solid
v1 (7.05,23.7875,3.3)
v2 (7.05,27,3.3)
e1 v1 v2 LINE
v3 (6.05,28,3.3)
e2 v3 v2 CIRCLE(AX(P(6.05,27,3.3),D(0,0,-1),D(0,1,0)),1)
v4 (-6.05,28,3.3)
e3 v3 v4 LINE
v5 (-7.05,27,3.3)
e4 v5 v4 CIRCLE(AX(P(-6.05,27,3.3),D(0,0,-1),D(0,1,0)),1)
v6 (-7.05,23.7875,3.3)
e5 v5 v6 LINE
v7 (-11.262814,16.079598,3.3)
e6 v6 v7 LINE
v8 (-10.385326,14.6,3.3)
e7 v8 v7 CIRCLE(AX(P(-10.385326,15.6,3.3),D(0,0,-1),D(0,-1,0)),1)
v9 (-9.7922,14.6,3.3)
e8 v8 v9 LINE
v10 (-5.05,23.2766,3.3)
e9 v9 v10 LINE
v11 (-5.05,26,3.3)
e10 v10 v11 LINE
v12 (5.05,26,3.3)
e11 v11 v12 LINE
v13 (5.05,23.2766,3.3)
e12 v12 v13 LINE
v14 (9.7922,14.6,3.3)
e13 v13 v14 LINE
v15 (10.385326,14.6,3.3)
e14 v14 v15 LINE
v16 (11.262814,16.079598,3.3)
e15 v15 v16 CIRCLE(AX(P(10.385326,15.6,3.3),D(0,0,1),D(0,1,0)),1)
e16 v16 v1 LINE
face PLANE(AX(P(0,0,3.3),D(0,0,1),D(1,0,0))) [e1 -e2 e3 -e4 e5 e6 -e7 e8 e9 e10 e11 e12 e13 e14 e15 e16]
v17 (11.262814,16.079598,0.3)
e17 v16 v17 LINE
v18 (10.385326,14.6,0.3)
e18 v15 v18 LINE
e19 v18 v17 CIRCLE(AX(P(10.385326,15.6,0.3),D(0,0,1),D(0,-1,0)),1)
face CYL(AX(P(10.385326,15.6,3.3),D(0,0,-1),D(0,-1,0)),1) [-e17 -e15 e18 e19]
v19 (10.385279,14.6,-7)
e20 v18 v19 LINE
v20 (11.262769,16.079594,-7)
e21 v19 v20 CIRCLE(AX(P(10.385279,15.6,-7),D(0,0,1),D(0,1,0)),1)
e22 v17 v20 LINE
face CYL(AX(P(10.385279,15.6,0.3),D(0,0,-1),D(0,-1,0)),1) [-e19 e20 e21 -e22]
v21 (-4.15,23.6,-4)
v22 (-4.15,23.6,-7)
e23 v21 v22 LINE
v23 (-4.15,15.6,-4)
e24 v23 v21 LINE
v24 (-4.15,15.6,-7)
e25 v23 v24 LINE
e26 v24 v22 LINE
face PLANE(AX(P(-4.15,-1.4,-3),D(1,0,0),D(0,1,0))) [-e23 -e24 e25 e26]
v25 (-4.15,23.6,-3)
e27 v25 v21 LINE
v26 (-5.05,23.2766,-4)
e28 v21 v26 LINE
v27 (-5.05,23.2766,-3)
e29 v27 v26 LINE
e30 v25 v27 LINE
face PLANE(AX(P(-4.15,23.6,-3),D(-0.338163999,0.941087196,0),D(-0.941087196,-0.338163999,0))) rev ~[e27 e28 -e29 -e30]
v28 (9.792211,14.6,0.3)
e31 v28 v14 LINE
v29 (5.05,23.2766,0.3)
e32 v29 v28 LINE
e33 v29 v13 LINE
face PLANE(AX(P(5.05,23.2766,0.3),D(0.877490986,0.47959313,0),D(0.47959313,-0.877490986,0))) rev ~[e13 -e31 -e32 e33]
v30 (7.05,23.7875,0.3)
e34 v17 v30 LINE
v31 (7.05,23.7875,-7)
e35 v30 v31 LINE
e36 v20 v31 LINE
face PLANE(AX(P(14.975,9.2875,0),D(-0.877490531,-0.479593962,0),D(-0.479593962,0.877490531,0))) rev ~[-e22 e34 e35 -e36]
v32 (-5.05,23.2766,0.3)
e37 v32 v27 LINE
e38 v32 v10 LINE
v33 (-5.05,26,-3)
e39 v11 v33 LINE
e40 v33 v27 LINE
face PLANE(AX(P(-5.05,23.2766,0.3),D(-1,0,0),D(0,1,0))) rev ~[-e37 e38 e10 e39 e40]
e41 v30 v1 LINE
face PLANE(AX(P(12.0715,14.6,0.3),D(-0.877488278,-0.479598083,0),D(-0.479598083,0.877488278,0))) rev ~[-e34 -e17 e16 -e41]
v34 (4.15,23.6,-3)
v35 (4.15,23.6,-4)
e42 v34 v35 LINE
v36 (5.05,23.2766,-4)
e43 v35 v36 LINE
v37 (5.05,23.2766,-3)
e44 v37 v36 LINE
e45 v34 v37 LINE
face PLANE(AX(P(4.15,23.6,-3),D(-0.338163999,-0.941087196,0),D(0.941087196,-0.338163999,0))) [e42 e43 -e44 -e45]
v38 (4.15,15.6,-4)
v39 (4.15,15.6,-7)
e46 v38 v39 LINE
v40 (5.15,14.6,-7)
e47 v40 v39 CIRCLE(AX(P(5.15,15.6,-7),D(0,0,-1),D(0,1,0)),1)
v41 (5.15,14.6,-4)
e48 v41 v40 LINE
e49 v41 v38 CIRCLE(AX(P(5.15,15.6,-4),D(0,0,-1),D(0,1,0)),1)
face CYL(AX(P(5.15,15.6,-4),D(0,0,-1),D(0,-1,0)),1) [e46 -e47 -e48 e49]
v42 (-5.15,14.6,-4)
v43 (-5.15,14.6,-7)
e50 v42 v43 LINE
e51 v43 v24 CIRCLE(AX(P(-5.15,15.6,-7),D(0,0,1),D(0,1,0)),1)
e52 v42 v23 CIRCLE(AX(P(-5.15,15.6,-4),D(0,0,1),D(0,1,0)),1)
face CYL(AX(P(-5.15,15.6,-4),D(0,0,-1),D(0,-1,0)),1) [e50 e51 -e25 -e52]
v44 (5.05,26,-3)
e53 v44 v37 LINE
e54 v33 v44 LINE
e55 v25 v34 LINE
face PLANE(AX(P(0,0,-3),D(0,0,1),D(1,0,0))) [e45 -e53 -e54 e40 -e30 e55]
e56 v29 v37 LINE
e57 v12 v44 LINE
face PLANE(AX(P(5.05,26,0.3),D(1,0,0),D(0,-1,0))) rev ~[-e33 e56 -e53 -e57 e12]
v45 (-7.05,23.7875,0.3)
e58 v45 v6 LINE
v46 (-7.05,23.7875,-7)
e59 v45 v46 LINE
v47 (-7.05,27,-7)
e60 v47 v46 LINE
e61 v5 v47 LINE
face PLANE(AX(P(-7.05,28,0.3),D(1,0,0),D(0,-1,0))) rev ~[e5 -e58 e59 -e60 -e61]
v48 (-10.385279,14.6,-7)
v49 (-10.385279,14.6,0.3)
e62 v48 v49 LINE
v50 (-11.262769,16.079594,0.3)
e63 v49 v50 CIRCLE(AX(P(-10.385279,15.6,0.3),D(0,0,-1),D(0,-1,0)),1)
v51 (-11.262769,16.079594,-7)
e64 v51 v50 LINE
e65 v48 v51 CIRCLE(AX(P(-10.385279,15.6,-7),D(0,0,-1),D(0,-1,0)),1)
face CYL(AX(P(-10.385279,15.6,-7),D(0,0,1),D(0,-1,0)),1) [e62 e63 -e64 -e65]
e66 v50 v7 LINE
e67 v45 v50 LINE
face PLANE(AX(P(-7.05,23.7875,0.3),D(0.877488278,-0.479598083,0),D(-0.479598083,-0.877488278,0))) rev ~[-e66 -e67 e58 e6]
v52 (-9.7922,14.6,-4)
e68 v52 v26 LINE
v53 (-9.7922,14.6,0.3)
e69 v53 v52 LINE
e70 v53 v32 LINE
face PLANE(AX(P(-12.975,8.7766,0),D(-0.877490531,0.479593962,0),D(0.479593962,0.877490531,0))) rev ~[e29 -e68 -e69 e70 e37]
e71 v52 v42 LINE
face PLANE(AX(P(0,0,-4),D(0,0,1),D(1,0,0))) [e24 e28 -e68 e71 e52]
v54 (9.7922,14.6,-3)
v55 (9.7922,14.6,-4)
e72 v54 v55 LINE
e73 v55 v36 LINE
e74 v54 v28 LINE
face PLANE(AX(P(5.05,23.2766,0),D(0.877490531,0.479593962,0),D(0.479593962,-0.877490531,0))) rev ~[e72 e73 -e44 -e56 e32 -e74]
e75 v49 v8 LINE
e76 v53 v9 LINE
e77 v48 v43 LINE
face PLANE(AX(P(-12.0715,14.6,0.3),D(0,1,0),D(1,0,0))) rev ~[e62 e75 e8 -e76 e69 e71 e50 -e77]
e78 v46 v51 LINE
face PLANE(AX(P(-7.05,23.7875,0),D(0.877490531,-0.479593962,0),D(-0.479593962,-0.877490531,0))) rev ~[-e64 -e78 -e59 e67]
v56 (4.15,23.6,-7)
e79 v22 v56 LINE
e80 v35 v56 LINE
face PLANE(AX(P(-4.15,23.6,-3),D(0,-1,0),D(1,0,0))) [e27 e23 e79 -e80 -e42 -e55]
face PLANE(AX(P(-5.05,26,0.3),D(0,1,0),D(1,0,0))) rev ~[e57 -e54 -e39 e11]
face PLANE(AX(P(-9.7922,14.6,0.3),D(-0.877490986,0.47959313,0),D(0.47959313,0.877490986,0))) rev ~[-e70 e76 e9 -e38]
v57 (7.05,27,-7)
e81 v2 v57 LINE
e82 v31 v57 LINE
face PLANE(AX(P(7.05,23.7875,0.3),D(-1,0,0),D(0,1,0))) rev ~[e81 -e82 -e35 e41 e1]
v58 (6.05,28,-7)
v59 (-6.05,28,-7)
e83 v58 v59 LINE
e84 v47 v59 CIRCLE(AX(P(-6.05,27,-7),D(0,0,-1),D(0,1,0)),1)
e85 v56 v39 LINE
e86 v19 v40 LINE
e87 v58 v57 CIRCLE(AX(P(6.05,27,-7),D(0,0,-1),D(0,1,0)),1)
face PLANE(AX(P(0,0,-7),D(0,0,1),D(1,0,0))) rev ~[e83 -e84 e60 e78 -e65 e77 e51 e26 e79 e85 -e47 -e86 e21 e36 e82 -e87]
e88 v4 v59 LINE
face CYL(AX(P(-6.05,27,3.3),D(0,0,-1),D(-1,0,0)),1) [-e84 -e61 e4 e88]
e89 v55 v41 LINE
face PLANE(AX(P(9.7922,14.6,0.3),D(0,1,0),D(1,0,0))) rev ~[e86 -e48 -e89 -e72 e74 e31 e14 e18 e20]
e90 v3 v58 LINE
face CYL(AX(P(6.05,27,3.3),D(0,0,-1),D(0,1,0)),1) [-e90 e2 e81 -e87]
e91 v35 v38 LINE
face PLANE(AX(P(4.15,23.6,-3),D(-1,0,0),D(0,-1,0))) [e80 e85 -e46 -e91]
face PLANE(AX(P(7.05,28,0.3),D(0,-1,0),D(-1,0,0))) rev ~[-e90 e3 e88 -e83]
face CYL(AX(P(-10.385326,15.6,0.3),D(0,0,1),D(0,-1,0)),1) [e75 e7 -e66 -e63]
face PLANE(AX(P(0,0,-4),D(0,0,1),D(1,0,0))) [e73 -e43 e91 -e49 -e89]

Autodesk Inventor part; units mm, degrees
ref_plane "YZ Plane" through (0, 0, 0) normal (1, 0, 0) x (0, 1, 0)
ref_plane "XZ Plane" through (0, 0, 0) normal (0, 1, 0) x (-1, 0, 0)
ref_plane "XY Plane" through (0, 0, 0) normal (0, 0, 1) x (1, 0, 0)
sketch "Sketch1" plane through (0, 0, 0) normal (0, 0, 1) x (1, 0, 0)
  line L0 (-5, -2.5) -> (5, -2.5) construction
  line L1 (5, -2.5) -> (12.675, 0) construction
  line L2 (-5, -2.5) -> (-12.675, 0)
  line L3 (12.675, 0) -> (-12.675, 0) construction
  line L4 (12.675, 0) -> (12.675, 8.7) construction
  line L5 (-12.675, 0) -> (-12.675, 8.7)
  line L6 (-12.675, 8.7) -> (-4.75, 23.2)
  line L7 (-4.75, 23.2) -> (-4.75, 25.7)
  line L8 (-4.75, 25.7) -> (4.75, 25.7) construction
  line L9 (4.75, 25.7) -> (4.75, 23.2) construction
  line L10 (4.75, 23.2) -> (12.675, 8.7) construction
  line L11 (0, -8.56) -> (0, 31.76) projected
  line L12 (0, 25.7) -> (0, -2.5)
  circle A0 centre (-10.8, 4.25) radius 1.25
  line L13 (-10.8, 4.25) -> (0, 4.25) construction
  line L14 (-4.75, 25.7) -> (0, 25.7)
  line L15 (-5, -2.5) -> (0, -2.5)
  line L16 (-5.05, 23.2766) -> (-12.975, 8.7766)
  line L17 (-12.975, 8.7766) -> (-12.975, -0.2178)
  line L18 (-12.975, -0.2178) -> (-5.0476, -2.8)
  line L19 (-5.0476, -2.8) -> (0.3, -2.8) construction
  line L20 (0.3, -2.8) -> (0.3, 26) construction
  line L21 (0.3, 26) -> (-5.05, 26) construction
  line L22 (-5.05, 26) -> (-5.05, 23.2766)
  line L23 (0, -2.5) -> (0, -2.8)
  line L24 (0, 25.7) -> (0, 26)
  line L25 (0, -2.8) -> (-5.0476, -2.8)
  line L26 (0, 26) -> (-5.05, 26)
  point P0 (0, 0)
  point P1 (0, 0)
  dimension "d0" = 10
  dimension "d1" = 25.35
  dimension "d2" = 2.5
  dimension "d3" = 8.7
  dimension "d4" = 28.2
  dimension "d6" = 2.5
  dimension "d7" = 9.5
  dimension "d42" = 2.5
  dimension "d43" = 10.8
  dimension "d44" = 6.75
  dimension "d53" = 0.3
sketch "Sketch8" plane through (0, 0, 0) normal (0, 0, 1) x (1, 0, 0)
  line L0 (-20, 30) -> (20, 30)
  line L1 (20, 30) -> (20, -10)
  line L2 (20, -10) -> (-20, -10)
  line L3 (-20, -10) -> (-20, 30)
  point P0 (0, 0)
  point P1 (0, -10)
  dimension "d45" = 40
  dimension "d46" = 10
extrude "MainBlock" add sketch "Sketch8" against normal blind 7
extrude "CartridgeCutout" cut sketch "Sketch1" against normal blind 3
sketch "Sketch10" plane through (-10.8, 4.25, 0) normal (0, 0, 1) x (1, 0, 0)
  circle A0 centre (0, 0) radius 1.25 projected
  circle A1 centre (0, 0) radius 1.45
  point P0 (10.8, -4.25)
  dimension "d56" = 0.2
extrude "PinHole" cut sketch "Sketch10" against normal through all contours A0 | A1
mirror "Mirror3" about plane through (0, 26, 0) normal (-1, 0, 0) of "CartridgeCutout", "PinHole"
sketch "Sketch12" plane through (0, 0, -3) normal (0, 0, 1) x (1, 0, 0)
  circle A0 centre (10.8, 4.25) radius 1.45 projected
  circle A1 centre (-10.8, 4.25) radius 1.45 projected
  line L0 (5.05, 26) -> (-5.05, 26) projected
  line L1 (-5.05, 23.2766) -> (-5.05, 26) projected
  line L2 (-12.975, 8.7766) -> (-5.05, 23.2766) projected
  line L3 (-12.975, -0.2178) -> (-12.975, 8.7766) projected
  line L4 (-5.0476, -2.8) -> (-12.975, -0.2178) projected
  line L5 (5.0476, -2.8) -> (-5.0476, -2.8) projected
  line L6 (5.0476, -2.8) -> (12.975, -0.2178) projected
  line L7 (12.975, -0.2178) -> (12.975, 8.7766) projected
  line L8 (12.975, 8.7766) -> (5.05, 23.2766) projected
  line L9 (5.05, 23.2766) -> (5.05, 26) projected
  line L10 (-4.15, 23.6) -> (4.15, 23.6)
  line L11 (4.15, 23.6) -> (4.15, -1.4)
  line L12 (4.15, -1.4) -> (-4.15, -1.4)
  line L13 (-4.15, -1.4) -> (-4.15, 23.6)
  point P0 (0, 0)
  point P1 (0, -1.4)
  dimension "d59" = 8.3
  dimension "d60" = 25
  dimension "d61" = 1.4
extrude "CentreHole" cut sketch "Sketch12" against normal through all contours L10 L11 L12 L13
sketch "Sketch13" plane through (0, 0, 0) normal (0, 0, 1) x (1, 0, 0)
  line L0 (-5.05, 26) -> (5.05, 26) projected
  line L1 (5.05, 26) -> (5.05, 23.2766) projected
  line L2 (5.05, 23.2766) -> (12.975, 8.7766) projected
  line L3 (12.975, 8.7766) -> (12.975, -0.2178) projected
  line L4 (12.975, -0.2178) -> (5.0476, -2.8) projected
  line L5 (5.0476, -2.8) -> (-5.0476, -2.8) projected
  line L6 (-5.0476, -2.8) -> (-12.975, -0.2178) projected
  line L7 (-12.975, -0.2178) -> (-12.975, 8.7766) projected
  line L8 (-12.975, 8.7766) -> (-5.05, 23.2766) projected
  line L9 (-5.05, 23.2766) -> (-5.05, 26) projected
  line L10 (-20, 30) -> (20, 30) projected
  line L11 (-20, -10) -> (-20, 30) projected
  line L12 (20, -10) -> (-20, -10) projected
  line L13 (20, 30) -> (20, -10) projected
  line L14 (-14.975, 9.2875) -> (-14.975, -1.6698)
  line L15 (-14.975, -1.6698) -> (-5.3652, -4.8)
  line L16 (-5.3652, -4.8) -> (5.3652, -4.8)
  line L17 (5.3652, -4.8) -> (14.975, -1.6698)
  line L18 (14.975, -1.6698) -> (14.975, 9.2875)
  line L19 (14.975, 9.2875) -> (7.05, 23.7875)
  line L20 (7.05, 23.7875) -> (7.05, 28)
  line L21 (7.05, 28) -> (-7.05, 28)
  line L22 (-7.05, 28) -> (-7.05, 23.7875)
  line L23 (-7.05, 23.7875) -> (-14.975, 9.2875)
  point P0 (0, 0)
  dimension "d65" = 2
extrude "OutlineCut" cut sketch "Sketch13" against normal through all contours L10 L13 L12 L11
sketch "Sketch14" plane through (0, 0, -3) normal (0, 0, 1) x (1, 0, 0)
  line L0 (-4.15, -1.4) -> (-4.15, 23.6) projected
  line L1 (-4.15, 23.6) -> (4.15, 23.6) projected
  line L2 (4.15, 23.6) -> (4.15, -1.4) projected
  line L3 (4.15, -1.4) -> (-4.15, -1.4) construction
  circle A0 centre (10.8, 4.25) radius 1.45 construction
  circle A1 centre (-10.8, 4.25) radius 1.45 construction
  line L4 (5.05, 26) -> (-5.05, 26) projected
  line L5 (-5.05, 23.2766) -> (-5.05, 26) projected
  line L6 (-12.975, 8.7766) -> (-5.05, 23.2766) projected
  line L7 (-12.975, -0.2178) -> (-12.975, 8.7766) construction
  line L8 (-5.0476, -2.8) -> (-12.975, -0.2178) construction
  line L9 (5.0476, -2.8) -> (-5.0476, -2.8) construction
  line L10 (5.0476, -2.8) -> (12.975, -0.2178) construction
  line L11 (12.975, -0.2178) -> (12.975, 8.7766) construction
  line L12 (12.975, 8.7766) -> (5.05, 23.2766) projected
  line L13 (5.05, 23.2766) -> (5.05, 26) projected
  line L14 (-9.7922, 14.6) -> (-4.15, 14.6)
  line L15 (-12.975, 8.7766) -> (-5.05, 23.2766) projected
  line L16 (-4.15, 23.6) -> (-5.05, 23.2766)
  line L17 (0, -18) -> (0, 38) projected
  line L18 (-4.15, 23.6) -> (-4.15, 14.6)
  line L19 (-4.15, -1.4) -> (-4.15, 23.6) projected
  line L20 (-5.05, 23.2766) -> (-9.7922, 14.6)
  line L21 (-12.975, 8.7766) -> (-5.05, 23.2766) projected
  line L22 (9.7922, 14.6) -> (4.15, 14.6)
  line L23 (4.15, 23.6) -> (5.05, 23.2766)
  line L24 (4.15, 23.6) -> (4.15, 14.6)
  line L25 (5.05, 23.2766) -> (9.7922, 14.6)
  point P0 (0, 0)
  dimension "d70" = 9
extrude "AlignmentGooveCut" cut sketch "Sketch14" against normal blind 1 contours L14 L6 L16 L0 | L23 L12 L22 L2
sketch "Sketch16" plane through (0, 0, 0) normal (0, 0, 1) x (1, 0, 0)
  line L0 (-8.5, 12.6) -> (8.5, 12.6)
  line L1 (8.5, 12.6) -> (8.5, -7.4)
  line L2 (8.5, -7.4) -> (-8.5, -7.4)
  line L3 (-8.5, -7.4) -> (-8.5, 12.6)
  line L4 (4.15, -1.4) -> (-4.15, -1.4) projected
  point P0 (0, 0)
  point P1 (0, -7.4)
  dimension "d73" = 17
  dimension "d74" = 20
  dimension "d75" = 14
extrude "CircuitBoardCut" cut sketch "Sketch16" against normal blind 6
sketch "Sketch18" plane through (0, 0, -6) normal (0, 0, 1) x (1, 0, 0)
  line L0 (-4.15, 12.6) -> (-4.15, -1.4) projected
  line L1 (-4.15, -1.4) -> (4.15, -1.4) projected
  line L2 (4.15, -1.4) -> (4.15, 12.6) projected
  line L3 (-4.15, 12.6) -> (4.15, 12.6)
  line L4 (-4.15, 23.6) -> (-4.15, -1.4) projected
  point P0 (0, 0)
extrude "CircuitBoardFillIn" add sketch "Sketch18" against normal up to surface (1 mm away)
sketch "Sketch19" plane through (0, 0, 0) normal (0, 0, 1) x (1, 0, 0)
  line L0 (8.5, -1.6754) -> (8.5, -3.7789) projected
  line L1 (8.5, -3.7789) -> (14.975, -1.6698) projected
  line L2 (14.975, -1.6698) -> (14.975, 9.2875) projected
  line L3 (14.975, 9.2875) -> (7.05, 23.7875) projected
  line L4 (7.05, 23.7875) -> (7.05, 28) projected
  line L5 (-7.05, 28) -> (-7.05, 23.7875) projected
  line L6 (-7.05, 23.7875) -> (-14.975, 9.2875) projected
  line L7 (-14.975, 9.2875) -> (-14.975, -1.6698) projected
  line L8 (-14.975, -1.6698) -> (-8.5, -3.7789) projected
  line L9 (-8.5, -3.7789) -> (-8.5, -1.6754) projected
  line L10 (-8.5, -1.6754) -> (-12.975, -0.2178) projected
  line L11 (-12.975, -0.2178) -> (-12.975, 8.7766) projected
  line L12 (-12.975, 8.7766) -> (-5.05, 23.2766) projected
  line L13 (-5.05, 23.2766) -> (-5.05, 26) projected
  line L14 (-5.05, 26) -> (5.05, 26) projected
  line L15 (5.05, 26) -> (5.05, 23.2766) projected
  line L16 (5.05, 23.2766) -> (12.975, 8.7766) projected
  line L17 (12.975, 8.7766) -> (12.975, -0.2178) projected
  line L18 (12.975, -0.2178) -> (8.5, -1.6754) projected
  line L19 (7.05, 28) -> (-7.05, 28) projected
  point P0 (0, 0)
extrude "TopHeightAdjustment" add sketch "Sketch19" along normal blind 0.3
sketch "Sketch20" plane through (0, 0, 0.3) normal (0, 0, 1) x (1, 0, 0)
  line L0 (-20, -14.6) -> (20, -14.6)
  line L1 (20, -14.6) -> (20, 14.6)
  line L2 (20, 14.6) -> (-20, 14.6)
  line L3 (-20, 14.6) -> (-20, -14.6)
  line L4 (-4.15, 14.6) -> (-9.7922, 14.6) projected
  point P0 (0, 0)
  point P1 (0, 14.6)
  point P2 (-20, 0)
  dimension "d89" = 40
extrude "Extrusion19" cut sketch "Sketch20" against normal through all
sketch "Sketch21" plane through (0, 0, 0.3) normal (0, 0, 1) x (1, 0, 0)
  line L0 (-12.0715, 14.6) -> (-9.7922, 14.6) projected
  line L1 (-9.7922, 14.6) -> (-5.05, 23.2766) projected
  line L2 (-5.05, 23.2766) -> (-5.05, 26) projected
  line L3 (-5.05, 26) -> (5.05, 26) projected
  line L4 (5.05, 26) -> (5.05, 23.2766) projected
  line L5 (5.05, 23.2766) -> (9.7922, 14.6) projected
  line L6 (9.7922, 14.6) -> (12.0715, 14.6) projected
  line L7 (12.0715, 14.6) -> (7.05, 23.7875) projected
  line L8 (7.05, 23.7875) -> (7.05, 28) projected
  line L9 (7.05, 28) -> (-7.05, 28) projected
  line L10 (-7.05, 28) -> (-7.05, 23.7875) projected
  line L11 (-7.05, 23.7875) -> (-12.0715, 14.6) projected
  point P0 (0, 0)
extrude "Extrusion20" add sketch "Sketch21" along normal blind 3
fillet "Fillet4" radius 1 6 edges at (-12.0715, 14.6, -1.85) (12.0715, 14.6, -1.85) (7.05, 28, -1.85) (4.15, 14.6, -5.5) (-4.15, 14.6, -5.5) (-7.05, 28, -1.85)
properties part number "TestShroud"
